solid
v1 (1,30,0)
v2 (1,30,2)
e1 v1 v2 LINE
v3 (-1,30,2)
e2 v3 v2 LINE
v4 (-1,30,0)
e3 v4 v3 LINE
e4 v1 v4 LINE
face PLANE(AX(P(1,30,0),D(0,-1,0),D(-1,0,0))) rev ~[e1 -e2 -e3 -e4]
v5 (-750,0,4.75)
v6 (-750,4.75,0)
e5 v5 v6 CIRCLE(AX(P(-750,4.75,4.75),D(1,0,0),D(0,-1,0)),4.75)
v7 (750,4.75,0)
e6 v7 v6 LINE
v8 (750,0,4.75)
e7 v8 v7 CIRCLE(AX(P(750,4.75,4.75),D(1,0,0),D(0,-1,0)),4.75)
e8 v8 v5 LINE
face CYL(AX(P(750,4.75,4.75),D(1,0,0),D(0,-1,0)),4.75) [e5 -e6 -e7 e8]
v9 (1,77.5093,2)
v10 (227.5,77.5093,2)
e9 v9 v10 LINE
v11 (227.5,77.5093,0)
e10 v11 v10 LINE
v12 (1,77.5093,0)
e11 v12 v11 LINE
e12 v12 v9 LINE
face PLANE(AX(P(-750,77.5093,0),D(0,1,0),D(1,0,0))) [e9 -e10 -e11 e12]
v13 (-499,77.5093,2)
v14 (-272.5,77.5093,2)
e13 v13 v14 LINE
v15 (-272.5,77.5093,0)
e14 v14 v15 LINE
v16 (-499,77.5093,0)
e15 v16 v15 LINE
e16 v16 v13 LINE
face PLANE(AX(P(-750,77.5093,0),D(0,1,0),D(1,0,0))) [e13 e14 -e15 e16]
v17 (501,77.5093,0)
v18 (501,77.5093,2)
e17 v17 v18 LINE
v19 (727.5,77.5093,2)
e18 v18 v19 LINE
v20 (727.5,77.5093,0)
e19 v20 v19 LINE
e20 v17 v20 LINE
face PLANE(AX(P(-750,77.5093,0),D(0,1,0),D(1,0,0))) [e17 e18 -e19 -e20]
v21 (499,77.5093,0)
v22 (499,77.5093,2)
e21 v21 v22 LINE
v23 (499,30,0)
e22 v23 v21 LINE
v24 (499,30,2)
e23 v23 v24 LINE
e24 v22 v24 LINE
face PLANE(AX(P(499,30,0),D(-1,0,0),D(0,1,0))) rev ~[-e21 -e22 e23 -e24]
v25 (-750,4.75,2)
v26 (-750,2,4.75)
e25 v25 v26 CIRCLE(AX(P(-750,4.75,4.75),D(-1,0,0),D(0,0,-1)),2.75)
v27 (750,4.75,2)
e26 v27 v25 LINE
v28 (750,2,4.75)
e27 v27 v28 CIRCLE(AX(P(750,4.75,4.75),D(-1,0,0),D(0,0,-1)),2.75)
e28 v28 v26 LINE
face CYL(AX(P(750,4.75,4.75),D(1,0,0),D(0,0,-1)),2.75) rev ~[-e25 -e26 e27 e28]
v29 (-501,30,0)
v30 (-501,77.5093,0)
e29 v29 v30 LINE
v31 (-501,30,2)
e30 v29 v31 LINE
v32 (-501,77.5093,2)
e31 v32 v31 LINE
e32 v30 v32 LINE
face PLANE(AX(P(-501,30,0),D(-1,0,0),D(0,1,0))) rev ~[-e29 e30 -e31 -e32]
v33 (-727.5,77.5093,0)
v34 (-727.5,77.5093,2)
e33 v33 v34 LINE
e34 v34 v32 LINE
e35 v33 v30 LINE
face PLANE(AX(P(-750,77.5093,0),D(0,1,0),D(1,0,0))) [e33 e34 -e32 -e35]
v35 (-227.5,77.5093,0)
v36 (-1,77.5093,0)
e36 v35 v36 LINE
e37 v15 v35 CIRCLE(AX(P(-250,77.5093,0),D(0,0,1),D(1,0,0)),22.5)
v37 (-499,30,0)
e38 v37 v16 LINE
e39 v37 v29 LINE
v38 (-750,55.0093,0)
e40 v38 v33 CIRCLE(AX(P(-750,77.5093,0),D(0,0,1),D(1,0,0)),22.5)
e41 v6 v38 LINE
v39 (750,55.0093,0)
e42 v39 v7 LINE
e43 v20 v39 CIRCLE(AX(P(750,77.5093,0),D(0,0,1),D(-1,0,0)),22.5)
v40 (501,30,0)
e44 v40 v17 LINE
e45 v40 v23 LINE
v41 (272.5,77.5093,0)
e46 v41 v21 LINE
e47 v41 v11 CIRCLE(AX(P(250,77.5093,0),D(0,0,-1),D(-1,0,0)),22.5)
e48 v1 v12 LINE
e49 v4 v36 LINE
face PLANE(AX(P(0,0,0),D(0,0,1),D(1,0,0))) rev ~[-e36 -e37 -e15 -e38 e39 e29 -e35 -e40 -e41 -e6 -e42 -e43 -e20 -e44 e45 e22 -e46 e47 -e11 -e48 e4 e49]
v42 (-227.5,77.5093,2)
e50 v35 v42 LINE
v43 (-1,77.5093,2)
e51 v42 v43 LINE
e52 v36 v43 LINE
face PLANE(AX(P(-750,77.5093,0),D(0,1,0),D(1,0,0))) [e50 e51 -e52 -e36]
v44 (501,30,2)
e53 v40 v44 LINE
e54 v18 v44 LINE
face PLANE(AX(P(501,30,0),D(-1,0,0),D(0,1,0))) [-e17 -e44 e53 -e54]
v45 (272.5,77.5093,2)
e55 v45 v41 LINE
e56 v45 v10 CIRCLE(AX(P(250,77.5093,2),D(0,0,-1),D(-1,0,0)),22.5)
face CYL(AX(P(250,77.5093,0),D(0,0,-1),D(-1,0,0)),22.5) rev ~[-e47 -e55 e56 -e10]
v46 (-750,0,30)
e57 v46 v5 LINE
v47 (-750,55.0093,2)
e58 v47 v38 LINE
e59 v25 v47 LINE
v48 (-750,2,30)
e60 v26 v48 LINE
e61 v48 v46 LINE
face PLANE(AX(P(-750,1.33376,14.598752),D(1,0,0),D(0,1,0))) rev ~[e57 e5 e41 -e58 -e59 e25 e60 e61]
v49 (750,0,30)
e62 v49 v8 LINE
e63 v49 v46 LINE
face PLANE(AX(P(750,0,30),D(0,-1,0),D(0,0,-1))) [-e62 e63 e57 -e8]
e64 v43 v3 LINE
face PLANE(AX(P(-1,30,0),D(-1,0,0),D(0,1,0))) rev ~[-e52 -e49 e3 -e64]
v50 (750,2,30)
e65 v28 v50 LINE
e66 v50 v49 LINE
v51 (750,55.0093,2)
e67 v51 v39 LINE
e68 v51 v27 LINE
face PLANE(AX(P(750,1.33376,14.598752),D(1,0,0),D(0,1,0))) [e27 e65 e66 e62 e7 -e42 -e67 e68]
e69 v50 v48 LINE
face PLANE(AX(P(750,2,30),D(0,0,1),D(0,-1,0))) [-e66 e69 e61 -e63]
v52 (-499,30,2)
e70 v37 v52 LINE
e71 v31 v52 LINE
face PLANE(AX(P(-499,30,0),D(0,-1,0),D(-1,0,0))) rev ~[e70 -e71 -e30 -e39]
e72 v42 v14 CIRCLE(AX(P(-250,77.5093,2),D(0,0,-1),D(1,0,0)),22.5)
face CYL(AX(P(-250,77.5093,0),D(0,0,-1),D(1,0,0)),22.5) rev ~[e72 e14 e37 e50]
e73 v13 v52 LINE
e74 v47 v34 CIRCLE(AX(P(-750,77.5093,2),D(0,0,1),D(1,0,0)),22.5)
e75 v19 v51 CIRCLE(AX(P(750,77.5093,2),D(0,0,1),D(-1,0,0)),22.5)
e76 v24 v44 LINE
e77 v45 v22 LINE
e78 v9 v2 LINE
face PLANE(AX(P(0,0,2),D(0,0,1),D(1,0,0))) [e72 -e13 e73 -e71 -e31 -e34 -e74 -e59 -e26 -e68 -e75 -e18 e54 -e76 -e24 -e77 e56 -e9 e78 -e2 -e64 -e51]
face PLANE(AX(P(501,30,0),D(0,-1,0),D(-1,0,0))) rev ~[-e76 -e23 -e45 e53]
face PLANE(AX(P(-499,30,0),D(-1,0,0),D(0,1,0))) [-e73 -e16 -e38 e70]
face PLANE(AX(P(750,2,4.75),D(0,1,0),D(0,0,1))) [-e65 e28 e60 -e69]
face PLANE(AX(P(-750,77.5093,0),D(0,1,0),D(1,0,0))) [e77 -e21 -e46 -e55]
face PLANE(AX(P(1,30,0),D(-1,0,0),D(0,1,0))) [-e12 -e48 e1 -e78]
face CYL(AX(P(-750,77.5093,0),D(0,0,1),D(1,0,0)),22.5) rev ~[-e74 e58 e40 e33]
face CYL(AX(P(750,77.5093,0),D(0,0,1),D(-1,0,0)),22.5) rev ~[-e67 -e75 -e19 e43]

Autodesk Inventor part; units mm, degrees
ref_plane "YZ Plane" through (0, 0, 0) normal (1, 0, 0) x (0, 1, 0)
ref_plane "XZ Plane" through (0, 0, 0) normal (0, 1, 0) x (-1, 0, 0)
ref_plane "XY Plane" through (0, 0, 0) normal (0, 0, 1) x (1, 0, 0)
sketch "Sketch1" plane through (0, 0, 0) normal (0, 0, 1) x (1, 0, 0)
  line L0 (-750, 77.5093) -> (750, 77.5093)
  line L1 (750, 77.5093) -> (750, 0)
  line L2 (750, 0) -> (-750, 0)
  line L3 (-750, 0) -> (-750, 77.5093)
  point P0 (0, 0)
  point P1 (0, 0)
  dimension "d0" = 1500
  dimension "d1" = 77.5093
extrude "Plate1" add sketch "Sketch1" along normal blind 2
sketch "Sketch2" plane through (750, 2, 0) normal (0, -1, 0) x (1, 0, 0)
  line L0 (-1500, 0) -> (0, 0)
  line L1 (0, 0) -> (0, 30)
  line L2 (0, 30) -> (-1500, 30)
  line L3 (-1500, 30) -> (-1500, 0)
edge flange "Flange1" height 30 angle 90 thickness 2 bend radius 2.75 thickness toward (0, -1, 0) relief round relief width 2 relief depth 1 edges at (0, 0, 2) wall of the first edge with corners at (-750, 2, 0) (750, 2, 0) (750, 2, 30) (-750, 2, 30)
bend "Bend1"
corner "Corner1"
sketch "Sketch5" plane through (0, 0, 0) normal (0, 0, -1) x (-1, 0, 0)
  line L0 (750, 77.5093) -> (-750, 77.5093) projected
  line L1 (-1, 30) -> (-1, 77.5093)
  line L2 (750, 0) -> (-750, 0) projected
  line L3 (-1, 30) -> (1, 30)
  line L4 (1, 30) -> (1, 77.5093)
  point P0 (0, 0)
  point P1 (0, 30)
  point P2 (0, 0)
  dimension "d27" = 2
  dimension "d28" = 30
extrude "Extrusion1" cut sketch "Sketch5" against normal through all
pattern_linear "Rectangular Pattern1" count 3 spacing 500 along (1, 0, 0) of "Extrusion1" first direction both ways yes
sketch "Sketch6" plane through (0, 0, 0) normal (0, 0, -1) x (-1, 0, 0)
  line L0 (-750, 77.5093) -> (-750, 4.75) projected
  circle A0 centre (-750, 77.5093) radius 22.5
  line L1 (-750, 77.5093) -> (750, 77.5093) projected
  line L2 (-1, 77.5093) -> (-1, 30) projected
  line L3 (-499, 77.5093) -> (-499, 30) projected
  line L4 (-1, 30) -> (-499, 30) construction
  circle A1 centre (-250, 77.5093) radius 22.5
  point P0 (0, 0)
  point P1 (-727.5, 77.5093)
  point P2 (-750, 55.0093)
  point P3 (-250, 30)
  dimension "d24" = 45
extrude "Extrusion2" cut sketch "Sketch6" along normal mid plane 30 contours L1 A0 L0 | A1 L1 | L1 A1 picked at (-748.3311, 62.6973)
mirror "Mirror1" about plane through (0, 0, 0) normal (1, 0, 0) of "Extrusion2"
sketch "Sketch7" plane through (0, 0, 2) normal (0, 0, 1) x (1, 0, 0)
  arc A0 (-750, 55.0093) -> (-727.5, 77.5093) centre (-750, 77.5093) ccw projected
  line L0 (-750, 4.75) -> (-750, 55.0093) projected
  line L1 (-750, 4.75) -> (750, 4.75) projected
  line L2 (750, 55.0093) -> (750, 4.75) projected
  arc A1 (727.5, 77.5093) -> (750, 55.0093) centre (750, 77.5093) ccw projected
  line L3 (501, 77.5093) -> (727.5, 77.5093) projected
  line L4 (501, 77.5093) -> (501, 30) projected
  line L5 (501, 30) -> (499, 30) projected
  line L6 (499, 30) -> (499, 77.5093) projected
  line L7 (1, 77.5093) -> (227.5, 77.5093) projected
  line L8 (1, 77.5093) -> (1, 30) projected
  line L9 (1, 30) -> (-1, 30) projected
  line L10 (-1, 30) -> (-1, 77.5093) projected
  line L11 (-499, 77.5093) -> (-272.5, 77.5093) projected
  line L12 (-499, 77.5093) -> (-499, 30) projected
  line L13 (-499, 30) -> (-501, 30) projected
  line L14 (-501, 30) -> (-501, 77.5093) projected
  line L15 (-727.5, 77.5093) -> (-501, 77.5093) projected
  line L16 (750, 4.75) -> (-750, 4.75) projected
  line L17 (650, 4.75) -> (650, 77.5093) construction
  line L18 (-750, 4.75) -> (750, 4.75) projected
  line L19 (646, 37.6655) -> (650, 44.5938)
  line L20 (650, 44.5938) -> (654, 37.6655)
  line L21 (654, 37.6655) -> (646, 37.6655)
  line L22 (650, 44.5938) -> (650, 37.6655) construction
  line L23 (626, 37.6655) -> (630, 44.5938)
  line L24 (630, 44.5938) -> (634, 37.6655)
  line L25 (634, 37.6655) -> (626, 37.6655)
  line L26 (630, 44.5938) -> (630, 37.6655) construction
  line L27 (272.5, 77.5093) -> (499, 77.5093) projected
  arc A2 (227.5, 77.5093) -> (272.5, 77.5093) centre (250, 77.5093) ccw projected
  line L28 (-227.5, 77.5093) -> (-1, 77.5093) projected
  arc A3 (-272.5, 77.5093) -> (-227.5, 77.5093) centre (-250, 77.5093) ccw projected
  point P0 (0, 0)
  point P1 (650, 41.1296)
  point P2 (630, 41.1296)
  dimension "d29" = 100
  dimension "d30" = 8
  dimension "d31" = 8
  dimension "d32" = 20
extrude "Extrusion3" [suppressed]
mirror "Mirror2" [suppressed]
sketch "Sketch8" plane through (0, 0, 2) normal (0, 0, 1) x (1, 0, 0)
  line L0 (496, 72.5093) -> (496, 60.5093) construction
  line L1 (496, 60.5093) -> (296, 60.5093) construction
  line L2 (296, 60.5093) -> (296, 72.5093) construction
  line L3 (296, 72.5093) -> (496, 72.5093) construction
  line L4 (501, 77.5093) -> (727.5, 77.5093) projected
  line L5 (272.5, 77.5093) -> (499, 77.5093) projected
  point P0 (0, 0)
  dimension "d35" = 200
  dimension "d36" = 12
  dimension "d39" = 3
  dimension "d40" = 5
mark "Mark1"
equation "\"d28\" = Стрингер_глубина_паза"
equation "\"d1\" = Стрингер_6"
equation "\"d27\" = d18"
equation "\"d2\" = Thickness"
equation "\"d3\" = BendReliefWidth"
equation "\"d4\" = BendReliefDepth"
equation "\"d5\" = MinimumRemnant"
equation "\"d6\" = TransitionRadius"
equation "\"d9\" = BendRadius"
equation "\"d10\" = CornerReliefSize"
equation "\"d11\" = GapSize"
equation "\"d12\" = JacobiRadiusSize"
equation "\"BendReliefWidth\" = Thickness"
equation "\"BendReliefDepth\" = 0.5 * Thickness"
equation "\"CornerReliefSize\" = 4 * Thickness"
equation "\"MinimumRemnant\" = 2 * Thickness"
equation "\"TransitionRadius\" = BendRadius"
equation "\"JacobiRadiusSize\" = BendRadius"
equation "\"GapSize\" = Thickness"
equation "\"d18\" = Thickness"
equation "\"Стрингер_6\" = 77.509299"
equation "\"Thickness\" = 2"
equation "\"BendRadius\" = 2.75"
equation "\"Стрингер_глубина_паза\" = 30"
properties part number "MSC 066 stringer board ####" material "Stainless Steel"
